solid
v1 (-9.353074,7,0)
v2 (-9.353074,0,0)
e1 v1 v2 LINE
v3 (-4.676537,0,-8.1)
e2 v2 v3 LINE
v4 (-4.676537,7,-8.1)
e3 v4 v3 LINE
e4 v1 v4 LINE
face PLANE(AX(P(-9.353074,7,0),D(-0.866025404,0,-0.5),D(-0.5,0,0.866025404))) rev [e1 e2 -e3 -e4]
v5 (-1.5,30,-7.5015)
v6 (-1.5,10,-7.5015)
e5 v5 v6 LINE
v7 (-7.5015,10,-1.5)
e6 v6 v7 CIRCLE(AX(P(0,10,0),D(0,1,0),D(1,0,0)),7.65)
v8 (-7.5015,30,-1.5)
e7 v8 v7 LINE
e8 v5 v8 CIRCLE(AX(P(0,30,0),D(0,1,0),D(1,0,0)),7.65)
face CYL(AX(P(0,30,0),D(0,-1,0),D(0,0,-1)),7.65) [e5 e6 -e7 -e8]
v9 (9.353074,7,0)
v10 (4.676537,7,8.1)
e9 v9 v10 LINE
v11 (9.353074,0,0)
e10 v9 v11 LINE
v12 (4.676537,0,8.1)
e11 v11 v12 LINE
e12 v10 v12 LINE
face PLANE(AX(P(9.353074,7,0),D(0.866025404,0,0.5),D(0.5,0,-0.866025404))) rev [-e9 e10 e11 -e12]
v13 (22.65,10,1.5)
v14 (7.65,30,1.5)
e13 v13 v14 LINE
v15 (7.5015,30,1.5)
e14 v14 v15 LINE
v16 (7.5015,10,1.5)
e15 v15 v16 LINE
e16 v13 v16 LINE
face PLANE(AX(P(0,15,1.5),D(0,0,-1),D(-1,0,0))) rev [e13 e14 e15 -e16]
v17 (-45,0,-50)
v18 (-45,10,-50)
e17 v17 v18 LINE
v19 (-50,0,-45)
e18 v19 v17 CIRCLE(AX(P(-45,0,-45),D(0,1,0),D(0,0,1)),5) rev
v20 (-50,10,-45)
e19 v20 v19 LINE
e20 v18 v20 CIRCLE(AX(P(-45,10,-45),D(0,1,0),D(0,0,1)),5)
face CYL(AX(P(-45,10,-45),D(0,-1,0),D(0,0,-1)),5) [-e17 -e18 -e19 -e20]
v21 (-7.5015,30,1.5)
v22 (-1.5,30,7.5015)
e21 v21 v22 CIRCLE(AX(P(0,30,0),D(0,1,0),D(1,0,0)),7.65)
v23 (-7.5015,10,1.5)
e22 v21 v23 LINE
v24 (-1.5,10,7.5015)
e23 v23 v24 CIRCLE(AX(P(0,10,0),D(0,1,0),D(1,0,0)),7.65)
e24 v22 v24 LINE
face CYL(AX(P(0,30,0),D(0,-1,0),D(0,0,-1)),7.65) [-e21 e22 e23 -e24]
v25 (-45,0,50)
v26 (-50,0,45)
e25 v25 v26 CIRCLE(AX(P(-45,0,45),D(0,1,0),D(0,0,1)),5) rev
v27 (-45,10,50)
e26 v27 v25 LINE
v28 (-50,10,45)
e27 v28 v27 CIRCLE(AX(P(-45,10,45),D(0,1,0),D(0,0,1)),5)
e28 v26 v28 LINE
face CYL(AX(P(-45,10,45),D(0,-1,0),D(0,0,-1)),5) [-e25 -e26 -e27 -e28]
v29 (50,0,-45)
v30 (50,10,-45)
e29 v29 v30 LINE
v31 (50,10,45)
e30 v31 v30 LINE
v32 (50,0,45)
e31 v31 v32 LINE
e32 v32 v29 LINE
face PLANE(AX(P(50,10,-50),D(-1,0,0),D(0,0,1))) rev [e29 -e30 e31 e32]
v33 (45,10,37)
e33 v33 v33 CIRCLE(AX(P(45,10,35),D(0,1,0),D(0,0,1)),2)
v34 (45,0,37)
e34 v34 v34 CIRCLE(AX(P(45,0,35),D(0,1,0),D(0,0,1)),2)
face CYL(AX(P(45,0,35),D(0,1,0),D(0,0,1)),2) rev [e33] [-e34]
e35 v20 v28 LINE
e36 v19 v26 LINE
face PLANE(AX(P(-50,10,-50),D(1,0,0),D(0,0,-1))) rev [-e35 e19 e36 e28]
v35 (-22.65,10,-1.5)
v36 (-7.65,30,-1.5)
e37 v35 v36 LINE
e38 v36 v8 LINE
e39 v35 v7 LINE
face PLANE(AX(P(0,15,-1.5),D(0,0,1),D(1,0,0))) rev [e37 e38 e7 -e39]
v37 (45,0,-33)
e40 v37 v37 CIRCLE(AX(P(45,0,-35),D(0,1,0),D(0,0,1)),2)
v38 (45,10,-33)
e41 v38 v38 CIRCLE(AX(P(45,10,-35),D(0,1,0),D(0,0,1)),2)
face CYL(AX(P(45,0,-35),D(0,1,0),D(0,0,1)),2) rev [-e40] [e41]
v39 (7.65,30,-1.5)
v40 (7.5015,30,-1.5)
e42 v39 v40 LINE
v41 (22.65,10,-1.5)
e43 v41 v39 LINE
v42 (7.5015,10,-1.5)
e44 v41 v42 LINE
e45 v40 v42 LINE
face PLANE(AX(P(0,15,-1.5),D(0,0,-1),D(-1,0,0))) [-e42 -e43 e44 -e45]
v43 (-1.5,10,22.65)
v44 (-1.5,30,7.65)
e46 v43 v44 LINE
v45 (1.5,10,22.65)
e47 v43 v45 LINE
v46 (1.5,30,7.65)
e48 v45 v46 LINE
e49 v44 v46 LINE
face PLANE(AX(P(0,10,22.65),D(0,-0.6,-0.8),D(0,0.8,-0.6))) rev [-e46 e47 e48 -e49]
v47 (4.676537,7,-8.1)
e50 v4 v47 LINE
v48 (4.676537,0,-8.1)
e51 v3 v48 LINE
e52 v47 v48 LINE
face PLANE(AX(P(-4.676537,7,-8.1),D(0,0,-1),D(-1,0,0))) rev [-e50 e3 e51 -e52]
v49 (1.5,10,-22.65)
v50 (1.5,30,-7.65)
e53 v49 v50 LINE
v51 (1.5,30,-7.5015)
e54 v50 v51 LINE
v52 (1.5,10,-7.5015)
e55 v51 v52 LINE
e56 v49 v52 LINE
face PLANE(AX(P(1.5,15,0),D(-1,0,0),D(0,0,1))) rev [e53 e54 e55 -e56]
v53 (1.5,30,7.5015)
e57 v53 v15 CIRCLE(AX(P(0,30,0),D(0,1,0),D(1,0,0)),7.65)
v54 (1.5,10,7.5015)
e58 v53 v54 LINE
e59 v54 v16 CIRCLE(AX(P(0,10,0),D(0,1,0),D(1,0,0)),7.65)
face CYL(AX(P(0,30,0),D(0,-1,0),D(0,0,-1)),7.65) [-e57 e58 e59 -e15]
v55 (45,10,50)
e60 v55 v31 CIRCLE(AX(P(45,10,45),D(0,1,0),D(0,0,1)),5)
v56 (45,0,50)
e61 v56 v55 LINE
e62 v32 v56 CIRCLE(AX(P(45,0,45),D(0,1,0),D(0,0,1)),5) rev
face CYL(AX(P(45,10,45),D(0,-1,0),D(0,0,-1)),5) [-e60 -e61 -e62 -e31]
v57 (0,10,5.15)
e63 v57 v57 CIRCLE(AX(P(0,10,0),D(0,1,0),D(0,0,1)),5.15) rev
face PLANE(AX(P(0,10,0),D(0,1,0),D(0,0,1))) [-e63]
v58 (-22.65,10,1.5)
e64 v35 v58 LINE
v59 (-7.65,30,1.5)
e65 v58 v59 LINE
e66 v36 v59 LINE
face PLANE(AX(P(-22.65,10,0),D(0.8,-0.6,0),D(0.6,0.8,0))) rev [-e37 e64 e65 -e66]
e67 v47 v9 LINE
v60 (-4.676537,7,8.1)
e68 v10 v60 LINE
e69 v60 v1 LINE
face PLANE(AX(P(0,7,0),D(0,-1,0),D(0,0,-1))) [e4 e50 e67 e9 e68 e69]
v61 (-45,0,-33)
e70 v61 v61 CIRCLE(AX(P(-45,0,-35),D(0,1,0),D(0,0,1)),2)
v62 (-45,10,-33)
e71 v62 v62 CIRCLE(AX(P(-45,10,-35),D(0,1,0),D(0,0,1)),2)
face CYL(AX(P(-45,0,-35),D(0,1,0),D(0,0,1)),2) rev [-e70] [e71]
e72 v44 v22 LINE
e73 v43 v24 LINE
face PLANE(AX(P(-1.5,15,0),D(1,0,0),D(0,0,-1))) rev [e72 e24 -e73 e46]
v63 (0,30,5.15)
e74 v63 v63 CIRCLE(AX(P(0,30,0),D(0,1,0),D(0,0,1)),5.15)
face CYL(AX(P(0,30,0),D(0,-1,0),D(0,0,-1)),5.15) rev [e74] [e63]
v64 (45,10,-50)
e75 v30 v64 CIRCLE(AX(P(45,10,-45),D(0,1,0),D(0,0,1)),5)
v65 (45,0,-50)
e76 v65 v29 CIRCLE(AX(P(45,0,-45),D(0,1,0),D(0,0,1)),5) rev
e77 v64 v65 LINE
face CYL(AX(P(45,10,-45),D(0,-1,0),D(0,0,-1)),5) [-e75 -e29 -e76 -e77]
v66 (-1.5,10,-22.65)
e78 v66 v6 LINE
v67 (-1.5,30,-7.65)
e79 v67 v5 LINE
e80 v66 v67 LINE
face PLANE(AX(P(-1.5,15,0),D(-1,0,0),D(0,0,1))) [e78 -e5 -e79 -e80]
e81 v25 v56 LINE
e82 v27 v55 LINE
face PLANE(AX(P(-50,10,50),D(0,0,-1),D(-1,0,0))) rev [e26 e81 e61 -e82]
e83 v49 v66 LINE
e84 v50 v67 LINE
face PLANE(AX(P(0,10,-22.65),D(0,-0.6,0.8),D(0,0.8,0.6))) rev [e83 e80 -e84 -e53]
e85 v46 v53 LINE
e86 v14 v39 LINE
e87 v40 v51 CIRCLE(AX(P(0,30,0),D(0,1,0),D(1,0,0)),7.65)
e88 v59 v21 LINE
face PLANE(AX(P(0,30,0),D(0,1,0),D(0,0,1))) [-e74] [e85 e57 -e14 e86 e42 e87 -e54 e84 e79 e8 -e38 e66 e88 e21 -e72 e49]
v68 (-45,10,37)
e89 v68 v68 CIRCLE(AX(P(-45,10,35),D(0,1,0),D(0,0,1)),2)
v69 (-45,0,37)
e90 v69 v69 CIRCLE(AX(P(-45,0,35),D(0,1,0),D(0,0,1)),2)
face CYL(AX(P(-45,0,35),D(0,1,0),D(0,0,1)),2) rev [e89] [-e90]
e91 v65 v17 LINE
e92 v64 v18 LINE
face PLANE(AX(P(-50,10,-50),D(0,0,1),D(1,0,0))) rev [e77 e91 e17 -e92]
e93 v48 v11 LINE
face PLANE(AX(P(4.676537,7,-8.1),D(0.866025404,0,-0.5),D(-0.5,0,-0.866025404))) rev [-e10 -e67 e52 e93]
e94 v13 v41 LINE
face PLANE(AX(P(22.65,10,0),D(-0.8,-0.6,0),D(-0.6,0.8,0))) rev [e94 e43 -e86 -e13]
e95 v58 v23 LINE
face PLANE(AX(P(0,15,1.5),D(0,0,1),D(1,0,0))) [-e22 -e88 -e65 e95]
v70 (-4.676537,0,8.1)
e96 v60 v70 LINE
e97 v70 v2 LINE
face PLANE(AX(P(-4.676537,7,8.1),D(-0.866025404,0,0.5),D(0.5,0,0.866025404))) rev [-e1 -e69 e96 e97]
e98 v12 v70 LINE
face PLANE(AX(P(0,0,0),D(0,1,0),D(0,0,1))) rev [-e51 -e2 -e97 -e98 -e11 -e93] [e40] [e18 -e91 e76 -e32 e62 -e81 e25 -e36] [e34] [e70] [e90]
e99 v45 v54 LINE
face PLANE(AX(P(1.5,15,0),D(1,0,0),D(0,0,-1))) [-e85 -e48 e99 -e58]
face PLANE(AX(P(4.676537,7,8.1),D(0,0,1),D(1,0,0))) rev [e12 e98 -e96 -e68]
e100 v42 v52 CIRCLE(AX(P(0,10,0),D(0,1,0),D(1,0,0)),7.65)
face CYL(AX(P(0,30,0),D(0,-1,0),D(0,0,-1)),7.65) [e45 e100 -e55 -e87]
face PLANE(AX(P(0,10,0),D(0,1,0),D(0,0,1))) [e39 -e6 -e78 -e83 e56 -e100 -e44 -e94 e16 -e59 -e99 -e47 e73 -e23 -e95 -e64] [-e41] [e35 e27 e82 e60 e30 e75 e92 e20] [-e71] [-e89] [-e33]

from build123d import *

# Parameters (mm, degrees)
SKETCH1_W           = 100
SKETCH1_H           = 100
BOSS_EXTRUDE1_DEPTH = 10
SKETCH2_R           = 2
CUT_EXTRUDE1_DEPTH  = 72.414284285
SKETCH3_R           = 7.65
SKETCH3_R_2         = 5.15
EXTRUDE_THIN1_DEPTH = 20
RIB1_START          = -1.5
RIB1_DEPTH          = 3
CIRPATTERN1_COUNT   = 4
FILLET1_R           = 5
CUT_EXTRUDE3_DEPTH  = 7


with BuildPart() as part:
    # Sketch1 → Boss-Extrude1 (new body)
    with BuildSketch(Plane(origin=(0, 0, 0), x_dir=(1, 0, 0), z_dir=(0, 1, 0))):
        Rectangle(SKETCH1_W, SKETCH1_H)
    extrude(amount=BOSS_EXTRUDE1_DEPTH)

    # Sketch2 → Cut-Extrude1 (cut, through all)
    with BuildSketch(Plane(origin=(0, 10, 0), x_dir=(1, 0, 0), z_dir=(0, 1, 0))):
        with Locations(Location((-45, 35, 0), (0, 0, 270))):
            Circle(SKETCH2_R)
        with Locations(Location((45, 35, 0), (0, 0, 270))):
            Circle(SKETCH2_R)
        with Locations(Location((45, -35, 0), (0, 0, 270))):
            Circle(SKETCH2_R)
        with Locations(Location((-45, -35, 0), (0, 0, 270))):
            Circle(SKETCH2_R)
    extrude(amount=-CUT_EXTRUDE1_DEPTH, mode=Mode.SUBTRACT)

    # Sketch3 → Extrude-Thin1 (add)
    with BuildSketch(Plane(origin=(0, 10, 0), x_dir=(1, 0, 0), z_dir=(0, 1, 0))):
        Circle(SKETCH3_R)
        Circle(SKETCH3_R_2, mode=Mode.SUBTRACT)
    extrude(amount=EXTRUDE_THIN1_DEPTH)

    # Rib1: read off the stored shape, not the designer's step
    # Rib1 outline → Rib1 (add)
    with BuildSketch(Plane.XY.offset(RIB1_START)):
        Polygon((-7.50149985, 30), (-7.65, 30), (-22.65, 10), (-7.50149985, 10), align=None)
    rib1 = extrude(amount=RIB1_DEPTH)

    # CirPattern1: Rib1 ×4 about axis
    cirpattern1_axis = Axis((0, 0, 0), (0, 1, 0))
    for i in range(1, CIRPATTERN1_COUNT):
        add(rib1.rotate(cirpattern1_axis, i * 360 / CIRPATTERN1_COUNT))

    # Fillet1
    fillet1_edges = [part.edges().sort_by_distance(p)[0] for p in [
        (50, 5, 50),
        (-50, 5, 50),
        (-50, 5, -50),
        (50, 5, -50),
    ]]
    fillet(fillet1_edges, radius=FILLET1_R)

    # Sketch6 → Cut-Extrude3 (cut)
    with BuildSketch(Plane.XZ):
        Polygon((4.67653718, -8.1), (9.353074361, 0), (4.67653718, 8.1), (-4.67653718, 8.1), (-9.353074361, 0), (-4.67653718, -8.1), align=None)
    extrude(amount=-CUT_EXTRUDE3_DEPTH, mode=Mode.SUBTRACT)


solid = part.part
